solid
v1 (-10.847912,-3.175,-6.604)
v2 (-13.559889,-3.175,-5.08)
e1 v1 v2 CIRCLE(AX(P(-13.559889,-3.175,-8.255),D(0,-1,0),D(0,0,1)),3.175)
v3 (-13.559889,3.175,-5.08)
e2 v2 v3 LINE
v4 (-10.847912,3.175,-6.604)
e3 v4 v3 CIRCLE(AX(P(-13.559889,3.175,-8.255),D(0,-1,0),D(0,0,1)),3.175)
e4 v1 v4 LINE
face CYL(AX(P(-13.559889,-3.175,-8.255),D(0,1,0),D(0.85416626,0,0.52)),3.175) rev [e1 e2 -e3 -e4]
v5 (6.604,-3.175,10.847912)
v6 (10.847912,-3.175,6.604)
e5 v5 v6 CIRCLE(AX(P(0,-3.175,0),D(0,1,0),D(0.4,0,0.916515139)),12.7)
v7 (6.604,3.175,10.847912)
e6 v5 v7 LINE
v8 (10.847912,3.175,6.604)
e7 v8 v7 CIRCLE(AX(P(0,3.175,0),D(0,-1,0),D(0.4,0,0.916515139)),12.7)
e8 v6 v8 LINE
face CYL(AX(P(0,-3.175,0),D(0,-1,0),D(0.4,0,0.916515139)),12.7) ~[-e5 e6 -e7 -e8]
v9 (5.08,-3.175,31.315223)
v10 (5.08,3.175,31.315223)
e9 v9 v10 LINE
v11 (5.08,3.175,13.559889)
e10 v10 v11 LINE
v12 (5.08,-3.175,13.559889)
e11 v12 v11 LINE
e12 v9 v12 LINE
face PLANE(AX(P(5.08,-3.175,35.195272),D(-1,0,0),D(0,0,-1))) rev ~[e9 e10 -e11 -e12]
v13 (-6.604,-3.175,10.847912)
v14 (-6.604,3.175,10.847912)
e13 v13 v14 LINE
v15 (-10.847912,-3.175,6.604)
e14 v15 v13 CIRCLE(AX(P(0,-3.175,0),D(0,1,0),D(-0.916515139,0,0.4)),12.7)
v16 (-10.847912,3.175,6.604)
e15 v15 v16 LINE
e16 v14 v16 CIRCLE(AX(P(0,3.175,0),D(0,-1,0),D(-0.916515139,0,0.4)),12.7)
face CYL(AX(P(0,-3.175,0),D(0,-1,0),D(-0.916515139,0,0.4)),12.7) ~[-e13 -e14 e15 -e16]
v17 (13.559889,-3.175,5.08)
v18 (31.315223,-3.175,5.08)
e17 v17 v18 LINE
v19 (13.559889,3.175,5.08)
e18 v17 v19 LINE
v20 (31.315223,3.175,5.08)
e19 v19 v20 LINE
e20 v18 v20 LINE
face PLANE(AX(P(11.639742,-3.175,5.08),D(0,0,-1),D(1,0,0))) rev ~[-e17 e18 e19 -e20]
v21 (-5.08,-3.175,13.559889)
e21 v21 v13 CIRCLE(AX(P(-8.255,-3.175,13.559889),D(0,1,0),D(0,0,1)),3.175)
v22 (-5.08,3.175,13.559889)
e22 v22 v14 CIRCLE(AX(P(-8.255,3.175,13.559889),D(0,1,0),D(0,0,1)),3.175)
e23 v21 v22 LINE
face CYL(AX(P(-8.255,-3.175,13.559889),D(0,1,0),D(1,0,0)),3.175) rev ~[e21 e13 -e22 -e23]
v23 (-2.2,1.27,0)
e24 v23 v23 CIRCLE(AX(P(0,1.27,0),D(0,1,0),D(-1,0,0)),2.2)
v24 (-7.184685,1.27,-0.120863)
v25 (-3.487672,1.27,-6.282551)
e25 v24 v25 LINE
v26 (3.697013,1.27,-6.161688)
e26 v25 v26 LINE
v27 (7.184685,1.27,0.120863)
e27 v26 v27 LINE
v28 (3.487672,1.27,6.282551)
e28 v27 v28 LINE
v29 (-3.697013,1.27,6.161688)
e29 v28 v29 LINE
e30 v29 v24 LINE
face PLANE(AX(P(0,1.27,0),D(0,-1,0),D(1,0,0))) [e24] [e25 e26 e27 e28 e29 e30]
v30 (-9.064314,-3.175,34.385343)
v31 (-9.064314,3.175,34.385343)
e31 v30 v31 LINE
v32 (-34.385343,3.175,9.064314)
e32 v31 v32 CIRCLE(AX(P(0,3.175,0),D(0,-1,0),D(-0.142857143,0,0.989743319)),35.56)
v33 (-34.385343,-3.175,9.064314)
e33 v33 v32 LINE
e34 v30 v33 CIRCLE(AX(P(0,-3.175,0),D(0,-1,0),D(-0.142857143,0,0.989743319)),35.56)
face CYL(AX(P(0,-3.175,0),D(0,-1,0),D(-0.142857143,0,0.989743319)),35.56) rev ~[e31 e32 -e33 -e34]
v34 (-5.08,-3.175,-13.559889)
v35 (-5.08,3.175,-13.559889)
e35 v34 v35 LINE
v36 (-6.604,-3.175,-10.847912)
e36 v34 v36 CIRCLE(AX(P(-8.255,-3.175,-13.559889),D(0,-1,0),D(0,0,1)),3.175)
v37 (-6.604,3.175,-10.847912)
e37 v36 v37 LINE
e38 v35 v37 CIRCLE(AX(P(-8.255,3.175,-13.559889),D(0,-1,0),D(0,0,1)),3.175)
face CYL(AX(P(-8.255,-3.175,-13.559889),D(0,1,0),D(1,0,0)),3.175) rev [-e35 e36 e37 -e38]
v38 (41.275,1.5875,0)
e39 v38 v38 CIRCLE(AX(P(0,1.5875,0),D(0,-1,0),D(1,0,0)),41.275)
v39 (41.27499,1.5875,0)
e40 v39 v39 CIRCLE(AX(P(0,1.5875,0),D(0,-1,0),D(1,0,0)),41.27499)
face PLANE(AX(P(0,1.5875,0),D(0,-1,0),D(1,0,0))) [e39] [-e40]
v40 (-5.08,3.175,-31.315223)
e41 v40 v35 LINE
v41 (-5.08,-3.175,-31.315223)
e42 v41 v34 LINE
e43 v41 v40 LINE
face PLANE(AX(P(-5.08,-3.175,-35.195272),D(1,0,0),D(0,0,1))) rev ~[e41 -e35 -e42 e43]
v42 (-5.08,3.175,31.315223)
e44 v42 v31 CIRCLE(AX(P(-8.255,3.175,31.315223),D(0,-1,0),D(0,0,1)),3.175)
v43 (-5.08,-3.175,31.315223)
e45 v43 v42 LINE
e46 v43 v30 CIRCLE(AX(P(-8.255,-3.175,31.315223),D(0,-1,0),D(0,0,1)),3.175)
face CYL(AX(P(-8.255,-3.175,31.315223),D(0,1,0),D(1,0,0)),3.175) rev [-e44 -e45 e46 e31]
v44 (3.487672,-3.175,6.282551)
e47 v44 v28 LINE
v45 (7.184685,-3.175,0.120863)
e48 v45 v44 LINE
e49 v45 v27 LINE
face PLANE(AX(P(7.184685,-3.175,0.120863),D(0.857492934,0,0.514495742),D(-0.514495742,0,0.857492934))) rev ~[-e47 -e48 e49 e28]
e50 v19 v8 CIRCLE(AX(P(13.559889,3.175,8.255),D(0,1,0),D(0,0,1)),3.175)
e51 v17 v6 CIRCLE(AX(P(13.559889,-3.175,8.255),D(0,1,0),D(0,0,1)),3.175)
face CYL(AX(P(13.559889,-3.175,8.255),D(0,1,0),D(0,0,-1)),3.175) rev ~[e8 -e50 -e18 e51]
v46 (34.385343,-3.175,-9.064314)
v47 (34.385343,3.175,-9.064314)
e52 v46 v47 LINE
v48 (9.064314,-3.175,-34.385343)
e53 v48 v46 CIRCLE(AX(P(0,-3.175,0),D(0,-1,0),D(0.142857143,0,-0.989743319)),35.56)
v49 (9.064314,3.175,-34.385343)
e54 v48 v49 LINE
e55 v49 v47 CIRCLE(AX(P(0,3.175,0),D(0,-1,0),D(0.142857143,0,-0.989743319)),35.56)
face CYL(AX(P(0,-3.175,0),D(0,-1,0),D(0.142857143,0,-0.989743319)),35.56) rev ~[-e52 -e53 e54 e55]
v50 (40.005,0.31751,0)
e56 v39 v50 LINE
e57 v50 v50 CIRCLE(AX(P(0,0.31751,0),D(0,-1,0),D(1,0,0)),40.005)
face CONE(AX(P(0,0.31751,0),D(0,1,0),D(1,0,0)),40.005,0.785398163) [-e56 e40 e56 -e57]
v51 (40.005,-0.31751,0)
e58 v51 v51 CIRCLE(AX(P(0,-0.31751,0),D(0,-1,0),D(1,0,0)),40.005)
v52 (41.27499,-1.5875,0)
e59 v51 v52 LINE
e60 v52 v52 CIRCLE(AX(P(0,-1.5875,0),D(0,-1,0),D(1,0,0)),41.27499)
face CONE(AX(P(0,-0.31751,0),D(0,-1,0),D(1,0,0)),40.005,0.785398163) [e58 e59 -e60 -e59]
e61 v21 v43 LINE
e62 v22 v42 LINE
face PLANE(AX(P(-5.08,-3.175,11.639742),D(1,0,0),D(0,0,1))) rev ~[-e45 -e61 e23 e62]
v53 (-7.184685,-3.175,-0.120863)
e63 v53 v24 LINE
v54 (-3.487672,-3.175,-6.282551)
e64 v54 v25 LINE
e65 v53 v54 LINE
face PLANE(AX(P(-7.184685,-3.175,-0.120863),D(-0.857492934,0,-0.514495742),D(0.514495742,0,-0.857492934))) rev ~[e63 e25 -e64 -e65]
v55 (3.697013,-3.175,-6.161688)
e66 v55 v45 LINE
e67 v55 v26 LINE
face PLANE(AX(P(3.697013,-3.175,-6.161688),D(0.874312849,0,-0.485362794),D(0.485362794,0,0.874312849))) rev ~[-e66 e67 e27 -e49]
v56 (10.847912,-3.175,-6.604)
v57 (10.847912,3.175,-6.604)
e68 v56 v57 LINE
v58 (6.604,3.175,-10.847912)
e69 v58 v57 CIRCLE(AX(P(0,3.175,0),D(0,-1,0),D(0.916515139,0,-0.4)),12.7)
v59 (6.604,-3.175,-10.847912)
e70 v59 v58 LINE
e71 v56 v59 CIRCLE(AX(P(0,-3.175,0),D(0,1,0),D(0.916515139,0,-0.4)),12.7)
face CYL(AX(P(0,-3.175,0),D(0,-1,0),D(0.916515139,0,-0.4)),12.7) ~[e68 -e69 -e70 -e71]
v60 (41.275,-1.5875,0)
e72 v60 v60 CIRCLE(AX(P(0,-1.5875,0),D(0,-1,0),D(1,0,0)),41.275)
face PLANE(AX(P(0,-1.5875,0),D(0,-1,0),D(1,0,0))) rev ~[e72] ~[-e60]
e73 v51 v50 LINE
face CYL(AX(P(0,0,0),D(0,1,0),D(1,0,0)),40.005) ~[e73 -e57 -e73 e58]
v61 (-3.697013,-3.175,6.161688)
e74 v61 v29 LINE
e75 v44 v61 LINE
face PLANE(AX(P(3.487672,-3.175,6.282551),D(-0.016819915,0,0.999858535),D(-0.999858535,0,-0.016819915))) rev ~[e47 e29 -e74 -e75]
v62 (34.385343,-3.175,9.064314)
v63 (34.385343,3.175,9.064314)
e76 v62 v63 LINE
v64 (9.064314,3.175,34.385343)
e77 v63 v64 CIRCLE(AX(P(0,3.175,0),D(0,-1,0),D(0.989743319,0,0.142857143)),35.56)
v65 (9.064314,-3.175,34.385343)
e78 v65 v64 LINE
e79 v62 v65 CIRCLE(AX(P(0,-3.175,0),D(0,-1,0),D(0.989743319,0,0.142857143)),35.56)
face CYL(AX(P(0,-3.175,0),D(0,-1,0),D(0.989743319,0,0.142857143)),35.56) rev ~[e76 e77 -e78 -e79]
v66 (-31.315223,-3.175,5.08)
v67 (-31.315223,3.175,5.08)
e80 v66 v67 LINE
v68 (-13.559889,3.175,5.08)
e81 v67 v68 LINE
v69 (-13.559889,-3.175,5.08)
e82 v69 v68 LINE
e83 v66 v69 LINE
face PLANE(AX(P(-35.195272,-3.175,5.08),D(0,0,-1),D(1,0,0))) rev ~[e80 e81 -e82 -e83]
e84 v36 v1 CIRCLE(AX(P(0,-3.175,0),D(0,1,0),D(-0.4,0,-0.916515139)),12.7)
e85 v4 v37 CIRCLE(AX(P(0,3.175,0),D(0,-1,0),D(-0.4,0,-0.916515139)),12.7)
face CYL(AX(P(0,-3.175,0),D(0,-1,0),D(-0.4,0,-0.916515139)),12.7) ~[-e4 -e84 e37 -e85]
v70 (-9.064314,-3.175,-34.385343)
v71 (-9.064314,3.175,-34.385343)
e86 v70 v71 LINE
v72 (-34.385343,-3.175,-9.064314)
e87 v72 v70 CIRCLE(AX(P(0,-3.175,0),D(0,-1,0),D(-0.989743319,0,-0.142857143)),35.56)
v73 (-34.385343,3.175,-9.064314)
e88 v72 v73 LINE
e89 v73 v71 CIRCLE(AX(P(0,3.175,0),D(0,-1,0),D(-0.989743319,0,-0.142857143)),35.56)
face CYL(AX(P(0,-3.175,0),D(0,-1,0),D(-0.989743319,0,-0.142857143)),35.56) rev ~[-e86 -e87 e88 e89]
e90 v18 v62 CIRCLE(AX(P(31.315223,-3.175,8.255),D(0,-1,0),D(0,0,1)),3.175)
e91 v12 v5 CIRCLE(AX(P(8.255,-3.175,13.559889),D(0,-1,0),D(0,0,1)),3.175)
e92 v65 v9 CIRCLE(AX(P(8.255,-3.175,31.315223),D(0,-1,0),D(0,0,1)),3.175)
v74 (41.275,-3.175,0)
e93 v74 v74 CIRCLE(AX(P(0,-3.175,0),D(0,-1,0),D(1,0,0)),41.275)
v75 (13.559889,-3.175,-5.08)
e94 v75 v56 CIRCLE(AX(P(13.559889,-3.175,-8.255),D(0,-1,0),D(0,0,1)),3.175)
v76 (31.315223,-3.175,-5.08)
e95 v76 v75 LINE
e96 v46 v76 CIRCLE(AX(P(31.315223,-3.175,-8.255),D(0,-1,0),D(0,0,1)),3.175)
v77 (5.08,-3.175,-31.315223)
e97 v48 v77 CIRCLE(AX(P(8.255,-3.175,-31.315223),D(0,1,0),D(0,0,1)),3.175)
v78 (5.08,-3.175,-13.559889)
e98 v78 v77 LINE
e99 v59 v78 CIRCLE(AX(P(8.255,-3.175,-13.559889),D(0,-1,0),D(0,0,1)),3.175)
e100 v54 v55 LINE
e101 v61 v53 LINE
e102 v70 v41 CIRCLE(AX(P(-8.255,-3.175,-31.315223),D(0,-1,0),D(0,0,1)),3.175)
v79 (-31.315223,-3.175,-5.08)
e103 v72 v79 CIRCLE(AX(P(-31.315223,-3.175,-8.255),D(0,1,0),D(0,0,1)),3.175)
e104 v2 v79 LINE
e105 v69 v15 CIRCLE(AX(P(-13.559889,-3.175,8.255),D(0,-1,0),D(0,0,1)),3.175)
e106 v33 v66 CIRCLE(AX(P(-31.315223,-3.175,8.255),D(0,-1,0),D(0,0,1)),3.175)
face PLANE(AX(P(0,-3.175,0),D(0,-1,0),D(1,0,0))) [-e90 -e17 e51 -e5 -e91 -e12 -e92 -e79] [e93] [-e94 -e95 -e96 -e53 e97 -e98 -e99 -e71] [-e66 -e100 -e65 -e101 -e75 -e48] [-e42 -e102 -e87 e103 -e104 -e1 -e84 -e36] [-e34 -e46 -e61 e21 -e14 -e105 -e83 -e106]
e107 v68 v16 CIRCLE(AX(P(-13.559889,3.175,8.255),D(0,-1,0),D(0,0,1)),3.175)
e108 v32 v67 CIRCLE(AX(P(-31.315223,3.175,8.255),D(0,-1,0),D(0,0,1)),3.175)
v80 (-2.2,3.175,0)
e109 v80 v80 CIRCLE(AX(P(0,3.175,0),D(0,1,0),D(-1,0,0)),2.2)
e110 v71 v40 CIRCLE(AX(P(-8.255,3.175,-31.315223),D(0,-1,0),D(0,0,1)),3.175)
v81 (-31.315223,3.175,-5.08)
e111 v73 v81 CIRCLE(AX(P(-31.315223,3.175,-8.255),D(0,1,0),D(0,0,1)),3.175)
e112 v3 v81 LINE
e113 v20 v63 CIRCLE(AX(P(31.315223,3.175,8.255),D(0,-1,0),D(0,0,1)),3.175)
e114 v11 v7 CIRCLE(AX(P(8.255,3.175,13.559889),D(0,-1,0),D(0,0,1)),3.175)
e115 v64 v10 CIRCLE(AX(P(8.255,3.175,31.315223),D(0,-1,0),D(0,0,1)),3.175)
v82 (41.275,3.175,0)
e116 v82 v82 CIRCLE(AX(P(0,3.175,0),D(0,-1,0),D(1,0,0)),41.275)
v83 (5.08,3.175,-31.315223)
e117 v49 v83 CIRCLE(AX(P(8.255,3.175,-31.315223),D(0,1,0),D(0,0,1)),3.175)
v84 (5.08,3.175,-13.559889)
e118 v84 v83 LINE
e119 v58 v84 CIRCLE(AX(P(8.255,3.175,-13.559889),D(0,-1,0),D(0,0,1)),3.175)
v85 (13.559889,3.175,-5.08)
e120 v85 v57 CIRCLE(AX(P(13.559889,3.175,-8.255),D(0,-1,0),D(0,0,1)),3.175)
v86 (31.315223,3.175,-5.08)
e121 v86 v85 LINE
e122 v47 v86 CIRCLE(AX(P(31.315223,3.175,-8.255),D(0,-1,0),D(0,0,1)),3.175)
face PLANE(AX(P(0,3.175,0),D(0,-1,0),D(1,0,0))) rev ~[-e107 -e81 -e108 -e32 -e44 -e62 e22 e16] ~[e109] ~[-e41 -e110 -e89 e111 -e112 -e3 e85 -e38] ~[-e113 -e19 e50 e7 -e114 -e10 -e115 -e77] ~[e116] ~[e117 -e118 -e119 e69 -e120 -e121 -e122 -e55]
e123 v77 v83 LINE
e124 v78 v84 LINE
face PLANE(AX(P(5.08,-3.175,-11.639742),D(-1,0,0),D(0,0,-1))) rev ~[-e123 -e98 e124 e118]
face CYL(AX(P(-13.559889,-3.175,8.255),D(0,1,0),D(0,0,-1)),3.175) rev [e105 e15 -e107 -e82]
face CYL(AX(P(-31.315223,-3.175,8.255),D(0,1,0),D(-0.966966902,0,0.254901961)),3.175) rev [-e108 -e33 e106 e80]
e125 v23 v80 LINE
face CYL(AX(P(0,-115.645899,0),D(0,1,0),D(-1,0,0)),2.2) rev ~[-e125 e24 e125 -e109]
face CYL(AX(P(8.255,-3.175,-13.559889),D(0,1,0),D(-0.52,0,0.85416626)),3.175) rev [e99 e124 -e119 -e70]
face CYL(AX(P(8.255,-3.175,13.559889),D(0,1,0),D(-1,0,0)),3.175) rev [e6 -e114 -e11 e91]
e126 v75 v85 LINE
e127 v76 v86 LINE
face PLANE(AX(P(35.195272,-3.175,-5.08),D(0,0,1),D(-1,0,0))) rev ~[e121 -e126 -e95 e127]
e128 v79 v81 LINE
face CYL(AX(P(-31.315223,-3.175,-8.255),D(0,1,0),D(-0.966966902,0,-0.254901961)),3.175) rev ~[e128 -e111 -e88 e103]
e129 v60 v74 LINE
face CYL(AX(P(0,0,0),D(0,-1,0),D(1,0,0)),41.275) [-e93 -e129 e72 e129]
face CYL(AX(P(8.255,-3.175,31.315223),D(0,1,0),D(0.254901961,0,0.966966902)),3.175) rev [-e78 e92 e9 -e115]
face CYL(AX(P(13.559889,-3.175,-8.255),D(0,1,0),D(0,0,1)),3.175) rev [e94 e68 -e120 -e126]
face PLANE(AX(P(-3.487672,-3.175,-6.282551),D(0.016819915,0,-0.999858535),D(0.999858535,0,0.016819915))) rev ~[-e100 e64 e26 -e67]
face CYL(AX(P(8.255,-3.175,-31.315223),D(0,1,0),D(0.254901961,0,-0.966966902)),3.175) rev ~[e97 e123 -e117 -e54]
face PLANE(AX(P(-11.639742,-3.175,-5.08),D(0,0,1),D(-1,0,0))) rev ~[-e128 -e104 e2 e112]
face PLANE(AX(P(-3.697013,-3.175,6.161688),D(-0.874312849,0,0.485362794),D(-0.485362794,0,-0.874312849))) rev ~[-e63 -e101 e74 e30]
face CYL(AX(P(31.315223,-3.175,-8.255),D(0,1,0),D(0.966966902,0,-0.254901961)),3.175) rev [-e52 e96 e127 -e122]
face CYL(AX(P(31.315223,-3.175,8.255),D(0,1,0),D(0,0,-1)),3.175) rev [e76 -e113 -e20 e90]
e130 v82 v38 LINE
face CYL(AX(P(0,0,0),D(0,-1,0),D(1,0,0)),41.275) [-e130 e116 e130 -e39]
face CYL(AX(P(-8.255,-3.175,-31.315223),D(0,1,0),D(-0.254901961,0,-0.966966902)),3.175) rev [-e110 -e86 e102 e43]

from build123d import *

# Parameters (mm, degrees)
F0_R      = 41.275
F0_R_2    = 40.005
F1_DEPTH  = 3.175
F3_DEPTH  = 4.445
F5_DEPTH  = 6.351
F6_R      = 3.175
F8_D      = 4.4
F9_R      = 41.275
F9_R_2    = 40.005
F10_DEPTH = 1.5875
F11_SIZE  = 1.26999


# Not quite as in the source:
# - a fillet or chamfer is up to 0.001 mm smaller than in the source, because OpenCascade refuses the exact size


with BuildPart() as f1:
    # F0 (on Front) → F1 (new body, symmetric)
    with BuildSketch(Plane.XZ):
        Circle(F0_R)
        Circle(F0_R_2, mode=Mode.SUBTRACT)
        Circle(F0_R_2)
        Polygon((-7.3323484187, 0), (-3.6661742094, 6.35), (3.6661742094, 6.35), (7.3323484187, 0), (3.6661742094, -6.35), (-3.6661742094, -6.35), align=None, mode=Mode.SUBTRACT)
        Polygon((3.6661742094, 6.35), (-3.6661742094, 6.35), (-7.3323484187, 0), (-3.6661742094, -6.35), (3.6661742094, -6.35), (7.3323484187, 0), align=None)
    extrude(amount=F1_DEPTH, both=True)

    # F2 (on face) → F3 (cut)
    with BuildSketch(Plane.XZ.offset(3.175)):
        Polygon((7.1846849266, 0.1208628901), (3.4876721301, 6.2825511097), (-3.6970127965, 6.1616882196), (-7.1846849266, -0.1208628901), (-3.4876721301, -6.2825511097), (3.6970127965, -6.1616882196), align=None)
    extrude(amount=-F3_DEPTH, mode=Mode.SUBTRACT)

    # F4 (on face) → F5 (cut, through all)
    with BuildSketch(Plane.XZ.offset(3.175)):
        with BuildLine():
            ThreePointArc((-35.1952724098, -5.08), (-25.144717139, -25.144717139), (-5.08, -35.1952724098))
            Line((-5.08, -35.1952724098), (-5.08, -11.6397422652))
            ThreePointArc((-5.08, -11.6397422652), (-8.9802561211, -8.9802561211), (-11.6397422652, -5.08))
            Line((-11.6397422652, -5.08), (-35.1952724098, -5.08))
        make_face()
        with BuildLine():
            Line((-5.08, 11.6397422652), (-5.08, 35.1952724098))
            ThreePointArc((-5.08, 35.1952724098), (-25.144717139, 25.144717139), (-35.1952724098, 5.08))
            Line((-35.1952724098, 5.08), (-11.6397422652, 5.08))
            ThreePointArc((-11.6397422652, 5.08), (-8.9802561211, 8.9802561211), (-5.08, 11.6397422652))
        make_face()
        with BuildLine():
            Line((11.6397422652, 5.08), (35.1952724098, 5.08))
            ThreePointArc((35.1952724098, 5.08), (25.144717139, 25.144717139), (5.08, 35.1952724098))
            Line((5.08, 35.1952724098), (5.08, 11.6397422652))
            ThreePointArc((5.08, 11.6397422652), (8.9802561211, 8.9802561211), (11.6397422652, 5.08))
        make_face()
        with BuildLine():
            ThreePointArc((5.08, -35.1952724098), (25.144717139, -25.144717139), (35.1952724098, -5.08))
            Line((35.1952724098, -5.08), (11.6397422652, -5.08))
            ThreePointArc((11.6397422652, -5.08), (8.9802561211, -8.9802561211), (5.08, -11.6397422652))
            Line((5.08, -11.6397422652), (5.08, -35.1952724098))
        make_face()
    extrude(amount=-F5_DEPTH, mode=Mode.SUBTRACT)

    # F6
    f6_edges = [f1.edges().sort_by_distance(p)[0] for p in [
        (-35.195272, 0, -5.08),
        (-11.639742, 0, -5.08),
        (-5.08, 0, -35.195272),
        (-5.08, 0, -11.639742),
        (5.08, 0, -35.195272),
        (5.08, 0, -11.639742),
        (35.195272, 0, -5.08),
        (11.639742, 0, -5.08),
        (-5.08, 0, 35.195272),
        (-5.08, 0, 11.639742),
        (-35.195272, 0, 5.08),
        (-11.639742, 0, 5.08),
        (35.195272, 0, 5.08),
        (11.639742, 0, 5.08),
        (5.08, 0, 35.195272),
        (5.08, 0, 11.639742),
    ]]
    fillet(f6_edges, radius=F6_R)

    # F8 (through all)
    with Locations(Plane.XZ.offset(-1.27)):
        with Locations((0, 0)):
            Hole(F8_D / 2)

    # F9 (on Front) → F10 (cut, symmetric)
    with BuildSketch(Plane.XZ):
        Circle(F9_R)
        Circle(F9_R_2, mode=Mode.SUBTRACT)
    extrude(amount=F10_DEPTH, both=True, mode=Mode.SUBTRACT)

    # F11 (size 1.27 in the source; OpenCascade refuses exactly that, so slightly less here)
    f11_edges = [f1.edges().sort_by_distance(p)[0] for p in [
        (-40.005, 1.5875, 0),
        (-40.005, -1.5875, 0),
    ]]
    chamfer(f11_edges, length=F11_SIZE)


solid = f1.part
